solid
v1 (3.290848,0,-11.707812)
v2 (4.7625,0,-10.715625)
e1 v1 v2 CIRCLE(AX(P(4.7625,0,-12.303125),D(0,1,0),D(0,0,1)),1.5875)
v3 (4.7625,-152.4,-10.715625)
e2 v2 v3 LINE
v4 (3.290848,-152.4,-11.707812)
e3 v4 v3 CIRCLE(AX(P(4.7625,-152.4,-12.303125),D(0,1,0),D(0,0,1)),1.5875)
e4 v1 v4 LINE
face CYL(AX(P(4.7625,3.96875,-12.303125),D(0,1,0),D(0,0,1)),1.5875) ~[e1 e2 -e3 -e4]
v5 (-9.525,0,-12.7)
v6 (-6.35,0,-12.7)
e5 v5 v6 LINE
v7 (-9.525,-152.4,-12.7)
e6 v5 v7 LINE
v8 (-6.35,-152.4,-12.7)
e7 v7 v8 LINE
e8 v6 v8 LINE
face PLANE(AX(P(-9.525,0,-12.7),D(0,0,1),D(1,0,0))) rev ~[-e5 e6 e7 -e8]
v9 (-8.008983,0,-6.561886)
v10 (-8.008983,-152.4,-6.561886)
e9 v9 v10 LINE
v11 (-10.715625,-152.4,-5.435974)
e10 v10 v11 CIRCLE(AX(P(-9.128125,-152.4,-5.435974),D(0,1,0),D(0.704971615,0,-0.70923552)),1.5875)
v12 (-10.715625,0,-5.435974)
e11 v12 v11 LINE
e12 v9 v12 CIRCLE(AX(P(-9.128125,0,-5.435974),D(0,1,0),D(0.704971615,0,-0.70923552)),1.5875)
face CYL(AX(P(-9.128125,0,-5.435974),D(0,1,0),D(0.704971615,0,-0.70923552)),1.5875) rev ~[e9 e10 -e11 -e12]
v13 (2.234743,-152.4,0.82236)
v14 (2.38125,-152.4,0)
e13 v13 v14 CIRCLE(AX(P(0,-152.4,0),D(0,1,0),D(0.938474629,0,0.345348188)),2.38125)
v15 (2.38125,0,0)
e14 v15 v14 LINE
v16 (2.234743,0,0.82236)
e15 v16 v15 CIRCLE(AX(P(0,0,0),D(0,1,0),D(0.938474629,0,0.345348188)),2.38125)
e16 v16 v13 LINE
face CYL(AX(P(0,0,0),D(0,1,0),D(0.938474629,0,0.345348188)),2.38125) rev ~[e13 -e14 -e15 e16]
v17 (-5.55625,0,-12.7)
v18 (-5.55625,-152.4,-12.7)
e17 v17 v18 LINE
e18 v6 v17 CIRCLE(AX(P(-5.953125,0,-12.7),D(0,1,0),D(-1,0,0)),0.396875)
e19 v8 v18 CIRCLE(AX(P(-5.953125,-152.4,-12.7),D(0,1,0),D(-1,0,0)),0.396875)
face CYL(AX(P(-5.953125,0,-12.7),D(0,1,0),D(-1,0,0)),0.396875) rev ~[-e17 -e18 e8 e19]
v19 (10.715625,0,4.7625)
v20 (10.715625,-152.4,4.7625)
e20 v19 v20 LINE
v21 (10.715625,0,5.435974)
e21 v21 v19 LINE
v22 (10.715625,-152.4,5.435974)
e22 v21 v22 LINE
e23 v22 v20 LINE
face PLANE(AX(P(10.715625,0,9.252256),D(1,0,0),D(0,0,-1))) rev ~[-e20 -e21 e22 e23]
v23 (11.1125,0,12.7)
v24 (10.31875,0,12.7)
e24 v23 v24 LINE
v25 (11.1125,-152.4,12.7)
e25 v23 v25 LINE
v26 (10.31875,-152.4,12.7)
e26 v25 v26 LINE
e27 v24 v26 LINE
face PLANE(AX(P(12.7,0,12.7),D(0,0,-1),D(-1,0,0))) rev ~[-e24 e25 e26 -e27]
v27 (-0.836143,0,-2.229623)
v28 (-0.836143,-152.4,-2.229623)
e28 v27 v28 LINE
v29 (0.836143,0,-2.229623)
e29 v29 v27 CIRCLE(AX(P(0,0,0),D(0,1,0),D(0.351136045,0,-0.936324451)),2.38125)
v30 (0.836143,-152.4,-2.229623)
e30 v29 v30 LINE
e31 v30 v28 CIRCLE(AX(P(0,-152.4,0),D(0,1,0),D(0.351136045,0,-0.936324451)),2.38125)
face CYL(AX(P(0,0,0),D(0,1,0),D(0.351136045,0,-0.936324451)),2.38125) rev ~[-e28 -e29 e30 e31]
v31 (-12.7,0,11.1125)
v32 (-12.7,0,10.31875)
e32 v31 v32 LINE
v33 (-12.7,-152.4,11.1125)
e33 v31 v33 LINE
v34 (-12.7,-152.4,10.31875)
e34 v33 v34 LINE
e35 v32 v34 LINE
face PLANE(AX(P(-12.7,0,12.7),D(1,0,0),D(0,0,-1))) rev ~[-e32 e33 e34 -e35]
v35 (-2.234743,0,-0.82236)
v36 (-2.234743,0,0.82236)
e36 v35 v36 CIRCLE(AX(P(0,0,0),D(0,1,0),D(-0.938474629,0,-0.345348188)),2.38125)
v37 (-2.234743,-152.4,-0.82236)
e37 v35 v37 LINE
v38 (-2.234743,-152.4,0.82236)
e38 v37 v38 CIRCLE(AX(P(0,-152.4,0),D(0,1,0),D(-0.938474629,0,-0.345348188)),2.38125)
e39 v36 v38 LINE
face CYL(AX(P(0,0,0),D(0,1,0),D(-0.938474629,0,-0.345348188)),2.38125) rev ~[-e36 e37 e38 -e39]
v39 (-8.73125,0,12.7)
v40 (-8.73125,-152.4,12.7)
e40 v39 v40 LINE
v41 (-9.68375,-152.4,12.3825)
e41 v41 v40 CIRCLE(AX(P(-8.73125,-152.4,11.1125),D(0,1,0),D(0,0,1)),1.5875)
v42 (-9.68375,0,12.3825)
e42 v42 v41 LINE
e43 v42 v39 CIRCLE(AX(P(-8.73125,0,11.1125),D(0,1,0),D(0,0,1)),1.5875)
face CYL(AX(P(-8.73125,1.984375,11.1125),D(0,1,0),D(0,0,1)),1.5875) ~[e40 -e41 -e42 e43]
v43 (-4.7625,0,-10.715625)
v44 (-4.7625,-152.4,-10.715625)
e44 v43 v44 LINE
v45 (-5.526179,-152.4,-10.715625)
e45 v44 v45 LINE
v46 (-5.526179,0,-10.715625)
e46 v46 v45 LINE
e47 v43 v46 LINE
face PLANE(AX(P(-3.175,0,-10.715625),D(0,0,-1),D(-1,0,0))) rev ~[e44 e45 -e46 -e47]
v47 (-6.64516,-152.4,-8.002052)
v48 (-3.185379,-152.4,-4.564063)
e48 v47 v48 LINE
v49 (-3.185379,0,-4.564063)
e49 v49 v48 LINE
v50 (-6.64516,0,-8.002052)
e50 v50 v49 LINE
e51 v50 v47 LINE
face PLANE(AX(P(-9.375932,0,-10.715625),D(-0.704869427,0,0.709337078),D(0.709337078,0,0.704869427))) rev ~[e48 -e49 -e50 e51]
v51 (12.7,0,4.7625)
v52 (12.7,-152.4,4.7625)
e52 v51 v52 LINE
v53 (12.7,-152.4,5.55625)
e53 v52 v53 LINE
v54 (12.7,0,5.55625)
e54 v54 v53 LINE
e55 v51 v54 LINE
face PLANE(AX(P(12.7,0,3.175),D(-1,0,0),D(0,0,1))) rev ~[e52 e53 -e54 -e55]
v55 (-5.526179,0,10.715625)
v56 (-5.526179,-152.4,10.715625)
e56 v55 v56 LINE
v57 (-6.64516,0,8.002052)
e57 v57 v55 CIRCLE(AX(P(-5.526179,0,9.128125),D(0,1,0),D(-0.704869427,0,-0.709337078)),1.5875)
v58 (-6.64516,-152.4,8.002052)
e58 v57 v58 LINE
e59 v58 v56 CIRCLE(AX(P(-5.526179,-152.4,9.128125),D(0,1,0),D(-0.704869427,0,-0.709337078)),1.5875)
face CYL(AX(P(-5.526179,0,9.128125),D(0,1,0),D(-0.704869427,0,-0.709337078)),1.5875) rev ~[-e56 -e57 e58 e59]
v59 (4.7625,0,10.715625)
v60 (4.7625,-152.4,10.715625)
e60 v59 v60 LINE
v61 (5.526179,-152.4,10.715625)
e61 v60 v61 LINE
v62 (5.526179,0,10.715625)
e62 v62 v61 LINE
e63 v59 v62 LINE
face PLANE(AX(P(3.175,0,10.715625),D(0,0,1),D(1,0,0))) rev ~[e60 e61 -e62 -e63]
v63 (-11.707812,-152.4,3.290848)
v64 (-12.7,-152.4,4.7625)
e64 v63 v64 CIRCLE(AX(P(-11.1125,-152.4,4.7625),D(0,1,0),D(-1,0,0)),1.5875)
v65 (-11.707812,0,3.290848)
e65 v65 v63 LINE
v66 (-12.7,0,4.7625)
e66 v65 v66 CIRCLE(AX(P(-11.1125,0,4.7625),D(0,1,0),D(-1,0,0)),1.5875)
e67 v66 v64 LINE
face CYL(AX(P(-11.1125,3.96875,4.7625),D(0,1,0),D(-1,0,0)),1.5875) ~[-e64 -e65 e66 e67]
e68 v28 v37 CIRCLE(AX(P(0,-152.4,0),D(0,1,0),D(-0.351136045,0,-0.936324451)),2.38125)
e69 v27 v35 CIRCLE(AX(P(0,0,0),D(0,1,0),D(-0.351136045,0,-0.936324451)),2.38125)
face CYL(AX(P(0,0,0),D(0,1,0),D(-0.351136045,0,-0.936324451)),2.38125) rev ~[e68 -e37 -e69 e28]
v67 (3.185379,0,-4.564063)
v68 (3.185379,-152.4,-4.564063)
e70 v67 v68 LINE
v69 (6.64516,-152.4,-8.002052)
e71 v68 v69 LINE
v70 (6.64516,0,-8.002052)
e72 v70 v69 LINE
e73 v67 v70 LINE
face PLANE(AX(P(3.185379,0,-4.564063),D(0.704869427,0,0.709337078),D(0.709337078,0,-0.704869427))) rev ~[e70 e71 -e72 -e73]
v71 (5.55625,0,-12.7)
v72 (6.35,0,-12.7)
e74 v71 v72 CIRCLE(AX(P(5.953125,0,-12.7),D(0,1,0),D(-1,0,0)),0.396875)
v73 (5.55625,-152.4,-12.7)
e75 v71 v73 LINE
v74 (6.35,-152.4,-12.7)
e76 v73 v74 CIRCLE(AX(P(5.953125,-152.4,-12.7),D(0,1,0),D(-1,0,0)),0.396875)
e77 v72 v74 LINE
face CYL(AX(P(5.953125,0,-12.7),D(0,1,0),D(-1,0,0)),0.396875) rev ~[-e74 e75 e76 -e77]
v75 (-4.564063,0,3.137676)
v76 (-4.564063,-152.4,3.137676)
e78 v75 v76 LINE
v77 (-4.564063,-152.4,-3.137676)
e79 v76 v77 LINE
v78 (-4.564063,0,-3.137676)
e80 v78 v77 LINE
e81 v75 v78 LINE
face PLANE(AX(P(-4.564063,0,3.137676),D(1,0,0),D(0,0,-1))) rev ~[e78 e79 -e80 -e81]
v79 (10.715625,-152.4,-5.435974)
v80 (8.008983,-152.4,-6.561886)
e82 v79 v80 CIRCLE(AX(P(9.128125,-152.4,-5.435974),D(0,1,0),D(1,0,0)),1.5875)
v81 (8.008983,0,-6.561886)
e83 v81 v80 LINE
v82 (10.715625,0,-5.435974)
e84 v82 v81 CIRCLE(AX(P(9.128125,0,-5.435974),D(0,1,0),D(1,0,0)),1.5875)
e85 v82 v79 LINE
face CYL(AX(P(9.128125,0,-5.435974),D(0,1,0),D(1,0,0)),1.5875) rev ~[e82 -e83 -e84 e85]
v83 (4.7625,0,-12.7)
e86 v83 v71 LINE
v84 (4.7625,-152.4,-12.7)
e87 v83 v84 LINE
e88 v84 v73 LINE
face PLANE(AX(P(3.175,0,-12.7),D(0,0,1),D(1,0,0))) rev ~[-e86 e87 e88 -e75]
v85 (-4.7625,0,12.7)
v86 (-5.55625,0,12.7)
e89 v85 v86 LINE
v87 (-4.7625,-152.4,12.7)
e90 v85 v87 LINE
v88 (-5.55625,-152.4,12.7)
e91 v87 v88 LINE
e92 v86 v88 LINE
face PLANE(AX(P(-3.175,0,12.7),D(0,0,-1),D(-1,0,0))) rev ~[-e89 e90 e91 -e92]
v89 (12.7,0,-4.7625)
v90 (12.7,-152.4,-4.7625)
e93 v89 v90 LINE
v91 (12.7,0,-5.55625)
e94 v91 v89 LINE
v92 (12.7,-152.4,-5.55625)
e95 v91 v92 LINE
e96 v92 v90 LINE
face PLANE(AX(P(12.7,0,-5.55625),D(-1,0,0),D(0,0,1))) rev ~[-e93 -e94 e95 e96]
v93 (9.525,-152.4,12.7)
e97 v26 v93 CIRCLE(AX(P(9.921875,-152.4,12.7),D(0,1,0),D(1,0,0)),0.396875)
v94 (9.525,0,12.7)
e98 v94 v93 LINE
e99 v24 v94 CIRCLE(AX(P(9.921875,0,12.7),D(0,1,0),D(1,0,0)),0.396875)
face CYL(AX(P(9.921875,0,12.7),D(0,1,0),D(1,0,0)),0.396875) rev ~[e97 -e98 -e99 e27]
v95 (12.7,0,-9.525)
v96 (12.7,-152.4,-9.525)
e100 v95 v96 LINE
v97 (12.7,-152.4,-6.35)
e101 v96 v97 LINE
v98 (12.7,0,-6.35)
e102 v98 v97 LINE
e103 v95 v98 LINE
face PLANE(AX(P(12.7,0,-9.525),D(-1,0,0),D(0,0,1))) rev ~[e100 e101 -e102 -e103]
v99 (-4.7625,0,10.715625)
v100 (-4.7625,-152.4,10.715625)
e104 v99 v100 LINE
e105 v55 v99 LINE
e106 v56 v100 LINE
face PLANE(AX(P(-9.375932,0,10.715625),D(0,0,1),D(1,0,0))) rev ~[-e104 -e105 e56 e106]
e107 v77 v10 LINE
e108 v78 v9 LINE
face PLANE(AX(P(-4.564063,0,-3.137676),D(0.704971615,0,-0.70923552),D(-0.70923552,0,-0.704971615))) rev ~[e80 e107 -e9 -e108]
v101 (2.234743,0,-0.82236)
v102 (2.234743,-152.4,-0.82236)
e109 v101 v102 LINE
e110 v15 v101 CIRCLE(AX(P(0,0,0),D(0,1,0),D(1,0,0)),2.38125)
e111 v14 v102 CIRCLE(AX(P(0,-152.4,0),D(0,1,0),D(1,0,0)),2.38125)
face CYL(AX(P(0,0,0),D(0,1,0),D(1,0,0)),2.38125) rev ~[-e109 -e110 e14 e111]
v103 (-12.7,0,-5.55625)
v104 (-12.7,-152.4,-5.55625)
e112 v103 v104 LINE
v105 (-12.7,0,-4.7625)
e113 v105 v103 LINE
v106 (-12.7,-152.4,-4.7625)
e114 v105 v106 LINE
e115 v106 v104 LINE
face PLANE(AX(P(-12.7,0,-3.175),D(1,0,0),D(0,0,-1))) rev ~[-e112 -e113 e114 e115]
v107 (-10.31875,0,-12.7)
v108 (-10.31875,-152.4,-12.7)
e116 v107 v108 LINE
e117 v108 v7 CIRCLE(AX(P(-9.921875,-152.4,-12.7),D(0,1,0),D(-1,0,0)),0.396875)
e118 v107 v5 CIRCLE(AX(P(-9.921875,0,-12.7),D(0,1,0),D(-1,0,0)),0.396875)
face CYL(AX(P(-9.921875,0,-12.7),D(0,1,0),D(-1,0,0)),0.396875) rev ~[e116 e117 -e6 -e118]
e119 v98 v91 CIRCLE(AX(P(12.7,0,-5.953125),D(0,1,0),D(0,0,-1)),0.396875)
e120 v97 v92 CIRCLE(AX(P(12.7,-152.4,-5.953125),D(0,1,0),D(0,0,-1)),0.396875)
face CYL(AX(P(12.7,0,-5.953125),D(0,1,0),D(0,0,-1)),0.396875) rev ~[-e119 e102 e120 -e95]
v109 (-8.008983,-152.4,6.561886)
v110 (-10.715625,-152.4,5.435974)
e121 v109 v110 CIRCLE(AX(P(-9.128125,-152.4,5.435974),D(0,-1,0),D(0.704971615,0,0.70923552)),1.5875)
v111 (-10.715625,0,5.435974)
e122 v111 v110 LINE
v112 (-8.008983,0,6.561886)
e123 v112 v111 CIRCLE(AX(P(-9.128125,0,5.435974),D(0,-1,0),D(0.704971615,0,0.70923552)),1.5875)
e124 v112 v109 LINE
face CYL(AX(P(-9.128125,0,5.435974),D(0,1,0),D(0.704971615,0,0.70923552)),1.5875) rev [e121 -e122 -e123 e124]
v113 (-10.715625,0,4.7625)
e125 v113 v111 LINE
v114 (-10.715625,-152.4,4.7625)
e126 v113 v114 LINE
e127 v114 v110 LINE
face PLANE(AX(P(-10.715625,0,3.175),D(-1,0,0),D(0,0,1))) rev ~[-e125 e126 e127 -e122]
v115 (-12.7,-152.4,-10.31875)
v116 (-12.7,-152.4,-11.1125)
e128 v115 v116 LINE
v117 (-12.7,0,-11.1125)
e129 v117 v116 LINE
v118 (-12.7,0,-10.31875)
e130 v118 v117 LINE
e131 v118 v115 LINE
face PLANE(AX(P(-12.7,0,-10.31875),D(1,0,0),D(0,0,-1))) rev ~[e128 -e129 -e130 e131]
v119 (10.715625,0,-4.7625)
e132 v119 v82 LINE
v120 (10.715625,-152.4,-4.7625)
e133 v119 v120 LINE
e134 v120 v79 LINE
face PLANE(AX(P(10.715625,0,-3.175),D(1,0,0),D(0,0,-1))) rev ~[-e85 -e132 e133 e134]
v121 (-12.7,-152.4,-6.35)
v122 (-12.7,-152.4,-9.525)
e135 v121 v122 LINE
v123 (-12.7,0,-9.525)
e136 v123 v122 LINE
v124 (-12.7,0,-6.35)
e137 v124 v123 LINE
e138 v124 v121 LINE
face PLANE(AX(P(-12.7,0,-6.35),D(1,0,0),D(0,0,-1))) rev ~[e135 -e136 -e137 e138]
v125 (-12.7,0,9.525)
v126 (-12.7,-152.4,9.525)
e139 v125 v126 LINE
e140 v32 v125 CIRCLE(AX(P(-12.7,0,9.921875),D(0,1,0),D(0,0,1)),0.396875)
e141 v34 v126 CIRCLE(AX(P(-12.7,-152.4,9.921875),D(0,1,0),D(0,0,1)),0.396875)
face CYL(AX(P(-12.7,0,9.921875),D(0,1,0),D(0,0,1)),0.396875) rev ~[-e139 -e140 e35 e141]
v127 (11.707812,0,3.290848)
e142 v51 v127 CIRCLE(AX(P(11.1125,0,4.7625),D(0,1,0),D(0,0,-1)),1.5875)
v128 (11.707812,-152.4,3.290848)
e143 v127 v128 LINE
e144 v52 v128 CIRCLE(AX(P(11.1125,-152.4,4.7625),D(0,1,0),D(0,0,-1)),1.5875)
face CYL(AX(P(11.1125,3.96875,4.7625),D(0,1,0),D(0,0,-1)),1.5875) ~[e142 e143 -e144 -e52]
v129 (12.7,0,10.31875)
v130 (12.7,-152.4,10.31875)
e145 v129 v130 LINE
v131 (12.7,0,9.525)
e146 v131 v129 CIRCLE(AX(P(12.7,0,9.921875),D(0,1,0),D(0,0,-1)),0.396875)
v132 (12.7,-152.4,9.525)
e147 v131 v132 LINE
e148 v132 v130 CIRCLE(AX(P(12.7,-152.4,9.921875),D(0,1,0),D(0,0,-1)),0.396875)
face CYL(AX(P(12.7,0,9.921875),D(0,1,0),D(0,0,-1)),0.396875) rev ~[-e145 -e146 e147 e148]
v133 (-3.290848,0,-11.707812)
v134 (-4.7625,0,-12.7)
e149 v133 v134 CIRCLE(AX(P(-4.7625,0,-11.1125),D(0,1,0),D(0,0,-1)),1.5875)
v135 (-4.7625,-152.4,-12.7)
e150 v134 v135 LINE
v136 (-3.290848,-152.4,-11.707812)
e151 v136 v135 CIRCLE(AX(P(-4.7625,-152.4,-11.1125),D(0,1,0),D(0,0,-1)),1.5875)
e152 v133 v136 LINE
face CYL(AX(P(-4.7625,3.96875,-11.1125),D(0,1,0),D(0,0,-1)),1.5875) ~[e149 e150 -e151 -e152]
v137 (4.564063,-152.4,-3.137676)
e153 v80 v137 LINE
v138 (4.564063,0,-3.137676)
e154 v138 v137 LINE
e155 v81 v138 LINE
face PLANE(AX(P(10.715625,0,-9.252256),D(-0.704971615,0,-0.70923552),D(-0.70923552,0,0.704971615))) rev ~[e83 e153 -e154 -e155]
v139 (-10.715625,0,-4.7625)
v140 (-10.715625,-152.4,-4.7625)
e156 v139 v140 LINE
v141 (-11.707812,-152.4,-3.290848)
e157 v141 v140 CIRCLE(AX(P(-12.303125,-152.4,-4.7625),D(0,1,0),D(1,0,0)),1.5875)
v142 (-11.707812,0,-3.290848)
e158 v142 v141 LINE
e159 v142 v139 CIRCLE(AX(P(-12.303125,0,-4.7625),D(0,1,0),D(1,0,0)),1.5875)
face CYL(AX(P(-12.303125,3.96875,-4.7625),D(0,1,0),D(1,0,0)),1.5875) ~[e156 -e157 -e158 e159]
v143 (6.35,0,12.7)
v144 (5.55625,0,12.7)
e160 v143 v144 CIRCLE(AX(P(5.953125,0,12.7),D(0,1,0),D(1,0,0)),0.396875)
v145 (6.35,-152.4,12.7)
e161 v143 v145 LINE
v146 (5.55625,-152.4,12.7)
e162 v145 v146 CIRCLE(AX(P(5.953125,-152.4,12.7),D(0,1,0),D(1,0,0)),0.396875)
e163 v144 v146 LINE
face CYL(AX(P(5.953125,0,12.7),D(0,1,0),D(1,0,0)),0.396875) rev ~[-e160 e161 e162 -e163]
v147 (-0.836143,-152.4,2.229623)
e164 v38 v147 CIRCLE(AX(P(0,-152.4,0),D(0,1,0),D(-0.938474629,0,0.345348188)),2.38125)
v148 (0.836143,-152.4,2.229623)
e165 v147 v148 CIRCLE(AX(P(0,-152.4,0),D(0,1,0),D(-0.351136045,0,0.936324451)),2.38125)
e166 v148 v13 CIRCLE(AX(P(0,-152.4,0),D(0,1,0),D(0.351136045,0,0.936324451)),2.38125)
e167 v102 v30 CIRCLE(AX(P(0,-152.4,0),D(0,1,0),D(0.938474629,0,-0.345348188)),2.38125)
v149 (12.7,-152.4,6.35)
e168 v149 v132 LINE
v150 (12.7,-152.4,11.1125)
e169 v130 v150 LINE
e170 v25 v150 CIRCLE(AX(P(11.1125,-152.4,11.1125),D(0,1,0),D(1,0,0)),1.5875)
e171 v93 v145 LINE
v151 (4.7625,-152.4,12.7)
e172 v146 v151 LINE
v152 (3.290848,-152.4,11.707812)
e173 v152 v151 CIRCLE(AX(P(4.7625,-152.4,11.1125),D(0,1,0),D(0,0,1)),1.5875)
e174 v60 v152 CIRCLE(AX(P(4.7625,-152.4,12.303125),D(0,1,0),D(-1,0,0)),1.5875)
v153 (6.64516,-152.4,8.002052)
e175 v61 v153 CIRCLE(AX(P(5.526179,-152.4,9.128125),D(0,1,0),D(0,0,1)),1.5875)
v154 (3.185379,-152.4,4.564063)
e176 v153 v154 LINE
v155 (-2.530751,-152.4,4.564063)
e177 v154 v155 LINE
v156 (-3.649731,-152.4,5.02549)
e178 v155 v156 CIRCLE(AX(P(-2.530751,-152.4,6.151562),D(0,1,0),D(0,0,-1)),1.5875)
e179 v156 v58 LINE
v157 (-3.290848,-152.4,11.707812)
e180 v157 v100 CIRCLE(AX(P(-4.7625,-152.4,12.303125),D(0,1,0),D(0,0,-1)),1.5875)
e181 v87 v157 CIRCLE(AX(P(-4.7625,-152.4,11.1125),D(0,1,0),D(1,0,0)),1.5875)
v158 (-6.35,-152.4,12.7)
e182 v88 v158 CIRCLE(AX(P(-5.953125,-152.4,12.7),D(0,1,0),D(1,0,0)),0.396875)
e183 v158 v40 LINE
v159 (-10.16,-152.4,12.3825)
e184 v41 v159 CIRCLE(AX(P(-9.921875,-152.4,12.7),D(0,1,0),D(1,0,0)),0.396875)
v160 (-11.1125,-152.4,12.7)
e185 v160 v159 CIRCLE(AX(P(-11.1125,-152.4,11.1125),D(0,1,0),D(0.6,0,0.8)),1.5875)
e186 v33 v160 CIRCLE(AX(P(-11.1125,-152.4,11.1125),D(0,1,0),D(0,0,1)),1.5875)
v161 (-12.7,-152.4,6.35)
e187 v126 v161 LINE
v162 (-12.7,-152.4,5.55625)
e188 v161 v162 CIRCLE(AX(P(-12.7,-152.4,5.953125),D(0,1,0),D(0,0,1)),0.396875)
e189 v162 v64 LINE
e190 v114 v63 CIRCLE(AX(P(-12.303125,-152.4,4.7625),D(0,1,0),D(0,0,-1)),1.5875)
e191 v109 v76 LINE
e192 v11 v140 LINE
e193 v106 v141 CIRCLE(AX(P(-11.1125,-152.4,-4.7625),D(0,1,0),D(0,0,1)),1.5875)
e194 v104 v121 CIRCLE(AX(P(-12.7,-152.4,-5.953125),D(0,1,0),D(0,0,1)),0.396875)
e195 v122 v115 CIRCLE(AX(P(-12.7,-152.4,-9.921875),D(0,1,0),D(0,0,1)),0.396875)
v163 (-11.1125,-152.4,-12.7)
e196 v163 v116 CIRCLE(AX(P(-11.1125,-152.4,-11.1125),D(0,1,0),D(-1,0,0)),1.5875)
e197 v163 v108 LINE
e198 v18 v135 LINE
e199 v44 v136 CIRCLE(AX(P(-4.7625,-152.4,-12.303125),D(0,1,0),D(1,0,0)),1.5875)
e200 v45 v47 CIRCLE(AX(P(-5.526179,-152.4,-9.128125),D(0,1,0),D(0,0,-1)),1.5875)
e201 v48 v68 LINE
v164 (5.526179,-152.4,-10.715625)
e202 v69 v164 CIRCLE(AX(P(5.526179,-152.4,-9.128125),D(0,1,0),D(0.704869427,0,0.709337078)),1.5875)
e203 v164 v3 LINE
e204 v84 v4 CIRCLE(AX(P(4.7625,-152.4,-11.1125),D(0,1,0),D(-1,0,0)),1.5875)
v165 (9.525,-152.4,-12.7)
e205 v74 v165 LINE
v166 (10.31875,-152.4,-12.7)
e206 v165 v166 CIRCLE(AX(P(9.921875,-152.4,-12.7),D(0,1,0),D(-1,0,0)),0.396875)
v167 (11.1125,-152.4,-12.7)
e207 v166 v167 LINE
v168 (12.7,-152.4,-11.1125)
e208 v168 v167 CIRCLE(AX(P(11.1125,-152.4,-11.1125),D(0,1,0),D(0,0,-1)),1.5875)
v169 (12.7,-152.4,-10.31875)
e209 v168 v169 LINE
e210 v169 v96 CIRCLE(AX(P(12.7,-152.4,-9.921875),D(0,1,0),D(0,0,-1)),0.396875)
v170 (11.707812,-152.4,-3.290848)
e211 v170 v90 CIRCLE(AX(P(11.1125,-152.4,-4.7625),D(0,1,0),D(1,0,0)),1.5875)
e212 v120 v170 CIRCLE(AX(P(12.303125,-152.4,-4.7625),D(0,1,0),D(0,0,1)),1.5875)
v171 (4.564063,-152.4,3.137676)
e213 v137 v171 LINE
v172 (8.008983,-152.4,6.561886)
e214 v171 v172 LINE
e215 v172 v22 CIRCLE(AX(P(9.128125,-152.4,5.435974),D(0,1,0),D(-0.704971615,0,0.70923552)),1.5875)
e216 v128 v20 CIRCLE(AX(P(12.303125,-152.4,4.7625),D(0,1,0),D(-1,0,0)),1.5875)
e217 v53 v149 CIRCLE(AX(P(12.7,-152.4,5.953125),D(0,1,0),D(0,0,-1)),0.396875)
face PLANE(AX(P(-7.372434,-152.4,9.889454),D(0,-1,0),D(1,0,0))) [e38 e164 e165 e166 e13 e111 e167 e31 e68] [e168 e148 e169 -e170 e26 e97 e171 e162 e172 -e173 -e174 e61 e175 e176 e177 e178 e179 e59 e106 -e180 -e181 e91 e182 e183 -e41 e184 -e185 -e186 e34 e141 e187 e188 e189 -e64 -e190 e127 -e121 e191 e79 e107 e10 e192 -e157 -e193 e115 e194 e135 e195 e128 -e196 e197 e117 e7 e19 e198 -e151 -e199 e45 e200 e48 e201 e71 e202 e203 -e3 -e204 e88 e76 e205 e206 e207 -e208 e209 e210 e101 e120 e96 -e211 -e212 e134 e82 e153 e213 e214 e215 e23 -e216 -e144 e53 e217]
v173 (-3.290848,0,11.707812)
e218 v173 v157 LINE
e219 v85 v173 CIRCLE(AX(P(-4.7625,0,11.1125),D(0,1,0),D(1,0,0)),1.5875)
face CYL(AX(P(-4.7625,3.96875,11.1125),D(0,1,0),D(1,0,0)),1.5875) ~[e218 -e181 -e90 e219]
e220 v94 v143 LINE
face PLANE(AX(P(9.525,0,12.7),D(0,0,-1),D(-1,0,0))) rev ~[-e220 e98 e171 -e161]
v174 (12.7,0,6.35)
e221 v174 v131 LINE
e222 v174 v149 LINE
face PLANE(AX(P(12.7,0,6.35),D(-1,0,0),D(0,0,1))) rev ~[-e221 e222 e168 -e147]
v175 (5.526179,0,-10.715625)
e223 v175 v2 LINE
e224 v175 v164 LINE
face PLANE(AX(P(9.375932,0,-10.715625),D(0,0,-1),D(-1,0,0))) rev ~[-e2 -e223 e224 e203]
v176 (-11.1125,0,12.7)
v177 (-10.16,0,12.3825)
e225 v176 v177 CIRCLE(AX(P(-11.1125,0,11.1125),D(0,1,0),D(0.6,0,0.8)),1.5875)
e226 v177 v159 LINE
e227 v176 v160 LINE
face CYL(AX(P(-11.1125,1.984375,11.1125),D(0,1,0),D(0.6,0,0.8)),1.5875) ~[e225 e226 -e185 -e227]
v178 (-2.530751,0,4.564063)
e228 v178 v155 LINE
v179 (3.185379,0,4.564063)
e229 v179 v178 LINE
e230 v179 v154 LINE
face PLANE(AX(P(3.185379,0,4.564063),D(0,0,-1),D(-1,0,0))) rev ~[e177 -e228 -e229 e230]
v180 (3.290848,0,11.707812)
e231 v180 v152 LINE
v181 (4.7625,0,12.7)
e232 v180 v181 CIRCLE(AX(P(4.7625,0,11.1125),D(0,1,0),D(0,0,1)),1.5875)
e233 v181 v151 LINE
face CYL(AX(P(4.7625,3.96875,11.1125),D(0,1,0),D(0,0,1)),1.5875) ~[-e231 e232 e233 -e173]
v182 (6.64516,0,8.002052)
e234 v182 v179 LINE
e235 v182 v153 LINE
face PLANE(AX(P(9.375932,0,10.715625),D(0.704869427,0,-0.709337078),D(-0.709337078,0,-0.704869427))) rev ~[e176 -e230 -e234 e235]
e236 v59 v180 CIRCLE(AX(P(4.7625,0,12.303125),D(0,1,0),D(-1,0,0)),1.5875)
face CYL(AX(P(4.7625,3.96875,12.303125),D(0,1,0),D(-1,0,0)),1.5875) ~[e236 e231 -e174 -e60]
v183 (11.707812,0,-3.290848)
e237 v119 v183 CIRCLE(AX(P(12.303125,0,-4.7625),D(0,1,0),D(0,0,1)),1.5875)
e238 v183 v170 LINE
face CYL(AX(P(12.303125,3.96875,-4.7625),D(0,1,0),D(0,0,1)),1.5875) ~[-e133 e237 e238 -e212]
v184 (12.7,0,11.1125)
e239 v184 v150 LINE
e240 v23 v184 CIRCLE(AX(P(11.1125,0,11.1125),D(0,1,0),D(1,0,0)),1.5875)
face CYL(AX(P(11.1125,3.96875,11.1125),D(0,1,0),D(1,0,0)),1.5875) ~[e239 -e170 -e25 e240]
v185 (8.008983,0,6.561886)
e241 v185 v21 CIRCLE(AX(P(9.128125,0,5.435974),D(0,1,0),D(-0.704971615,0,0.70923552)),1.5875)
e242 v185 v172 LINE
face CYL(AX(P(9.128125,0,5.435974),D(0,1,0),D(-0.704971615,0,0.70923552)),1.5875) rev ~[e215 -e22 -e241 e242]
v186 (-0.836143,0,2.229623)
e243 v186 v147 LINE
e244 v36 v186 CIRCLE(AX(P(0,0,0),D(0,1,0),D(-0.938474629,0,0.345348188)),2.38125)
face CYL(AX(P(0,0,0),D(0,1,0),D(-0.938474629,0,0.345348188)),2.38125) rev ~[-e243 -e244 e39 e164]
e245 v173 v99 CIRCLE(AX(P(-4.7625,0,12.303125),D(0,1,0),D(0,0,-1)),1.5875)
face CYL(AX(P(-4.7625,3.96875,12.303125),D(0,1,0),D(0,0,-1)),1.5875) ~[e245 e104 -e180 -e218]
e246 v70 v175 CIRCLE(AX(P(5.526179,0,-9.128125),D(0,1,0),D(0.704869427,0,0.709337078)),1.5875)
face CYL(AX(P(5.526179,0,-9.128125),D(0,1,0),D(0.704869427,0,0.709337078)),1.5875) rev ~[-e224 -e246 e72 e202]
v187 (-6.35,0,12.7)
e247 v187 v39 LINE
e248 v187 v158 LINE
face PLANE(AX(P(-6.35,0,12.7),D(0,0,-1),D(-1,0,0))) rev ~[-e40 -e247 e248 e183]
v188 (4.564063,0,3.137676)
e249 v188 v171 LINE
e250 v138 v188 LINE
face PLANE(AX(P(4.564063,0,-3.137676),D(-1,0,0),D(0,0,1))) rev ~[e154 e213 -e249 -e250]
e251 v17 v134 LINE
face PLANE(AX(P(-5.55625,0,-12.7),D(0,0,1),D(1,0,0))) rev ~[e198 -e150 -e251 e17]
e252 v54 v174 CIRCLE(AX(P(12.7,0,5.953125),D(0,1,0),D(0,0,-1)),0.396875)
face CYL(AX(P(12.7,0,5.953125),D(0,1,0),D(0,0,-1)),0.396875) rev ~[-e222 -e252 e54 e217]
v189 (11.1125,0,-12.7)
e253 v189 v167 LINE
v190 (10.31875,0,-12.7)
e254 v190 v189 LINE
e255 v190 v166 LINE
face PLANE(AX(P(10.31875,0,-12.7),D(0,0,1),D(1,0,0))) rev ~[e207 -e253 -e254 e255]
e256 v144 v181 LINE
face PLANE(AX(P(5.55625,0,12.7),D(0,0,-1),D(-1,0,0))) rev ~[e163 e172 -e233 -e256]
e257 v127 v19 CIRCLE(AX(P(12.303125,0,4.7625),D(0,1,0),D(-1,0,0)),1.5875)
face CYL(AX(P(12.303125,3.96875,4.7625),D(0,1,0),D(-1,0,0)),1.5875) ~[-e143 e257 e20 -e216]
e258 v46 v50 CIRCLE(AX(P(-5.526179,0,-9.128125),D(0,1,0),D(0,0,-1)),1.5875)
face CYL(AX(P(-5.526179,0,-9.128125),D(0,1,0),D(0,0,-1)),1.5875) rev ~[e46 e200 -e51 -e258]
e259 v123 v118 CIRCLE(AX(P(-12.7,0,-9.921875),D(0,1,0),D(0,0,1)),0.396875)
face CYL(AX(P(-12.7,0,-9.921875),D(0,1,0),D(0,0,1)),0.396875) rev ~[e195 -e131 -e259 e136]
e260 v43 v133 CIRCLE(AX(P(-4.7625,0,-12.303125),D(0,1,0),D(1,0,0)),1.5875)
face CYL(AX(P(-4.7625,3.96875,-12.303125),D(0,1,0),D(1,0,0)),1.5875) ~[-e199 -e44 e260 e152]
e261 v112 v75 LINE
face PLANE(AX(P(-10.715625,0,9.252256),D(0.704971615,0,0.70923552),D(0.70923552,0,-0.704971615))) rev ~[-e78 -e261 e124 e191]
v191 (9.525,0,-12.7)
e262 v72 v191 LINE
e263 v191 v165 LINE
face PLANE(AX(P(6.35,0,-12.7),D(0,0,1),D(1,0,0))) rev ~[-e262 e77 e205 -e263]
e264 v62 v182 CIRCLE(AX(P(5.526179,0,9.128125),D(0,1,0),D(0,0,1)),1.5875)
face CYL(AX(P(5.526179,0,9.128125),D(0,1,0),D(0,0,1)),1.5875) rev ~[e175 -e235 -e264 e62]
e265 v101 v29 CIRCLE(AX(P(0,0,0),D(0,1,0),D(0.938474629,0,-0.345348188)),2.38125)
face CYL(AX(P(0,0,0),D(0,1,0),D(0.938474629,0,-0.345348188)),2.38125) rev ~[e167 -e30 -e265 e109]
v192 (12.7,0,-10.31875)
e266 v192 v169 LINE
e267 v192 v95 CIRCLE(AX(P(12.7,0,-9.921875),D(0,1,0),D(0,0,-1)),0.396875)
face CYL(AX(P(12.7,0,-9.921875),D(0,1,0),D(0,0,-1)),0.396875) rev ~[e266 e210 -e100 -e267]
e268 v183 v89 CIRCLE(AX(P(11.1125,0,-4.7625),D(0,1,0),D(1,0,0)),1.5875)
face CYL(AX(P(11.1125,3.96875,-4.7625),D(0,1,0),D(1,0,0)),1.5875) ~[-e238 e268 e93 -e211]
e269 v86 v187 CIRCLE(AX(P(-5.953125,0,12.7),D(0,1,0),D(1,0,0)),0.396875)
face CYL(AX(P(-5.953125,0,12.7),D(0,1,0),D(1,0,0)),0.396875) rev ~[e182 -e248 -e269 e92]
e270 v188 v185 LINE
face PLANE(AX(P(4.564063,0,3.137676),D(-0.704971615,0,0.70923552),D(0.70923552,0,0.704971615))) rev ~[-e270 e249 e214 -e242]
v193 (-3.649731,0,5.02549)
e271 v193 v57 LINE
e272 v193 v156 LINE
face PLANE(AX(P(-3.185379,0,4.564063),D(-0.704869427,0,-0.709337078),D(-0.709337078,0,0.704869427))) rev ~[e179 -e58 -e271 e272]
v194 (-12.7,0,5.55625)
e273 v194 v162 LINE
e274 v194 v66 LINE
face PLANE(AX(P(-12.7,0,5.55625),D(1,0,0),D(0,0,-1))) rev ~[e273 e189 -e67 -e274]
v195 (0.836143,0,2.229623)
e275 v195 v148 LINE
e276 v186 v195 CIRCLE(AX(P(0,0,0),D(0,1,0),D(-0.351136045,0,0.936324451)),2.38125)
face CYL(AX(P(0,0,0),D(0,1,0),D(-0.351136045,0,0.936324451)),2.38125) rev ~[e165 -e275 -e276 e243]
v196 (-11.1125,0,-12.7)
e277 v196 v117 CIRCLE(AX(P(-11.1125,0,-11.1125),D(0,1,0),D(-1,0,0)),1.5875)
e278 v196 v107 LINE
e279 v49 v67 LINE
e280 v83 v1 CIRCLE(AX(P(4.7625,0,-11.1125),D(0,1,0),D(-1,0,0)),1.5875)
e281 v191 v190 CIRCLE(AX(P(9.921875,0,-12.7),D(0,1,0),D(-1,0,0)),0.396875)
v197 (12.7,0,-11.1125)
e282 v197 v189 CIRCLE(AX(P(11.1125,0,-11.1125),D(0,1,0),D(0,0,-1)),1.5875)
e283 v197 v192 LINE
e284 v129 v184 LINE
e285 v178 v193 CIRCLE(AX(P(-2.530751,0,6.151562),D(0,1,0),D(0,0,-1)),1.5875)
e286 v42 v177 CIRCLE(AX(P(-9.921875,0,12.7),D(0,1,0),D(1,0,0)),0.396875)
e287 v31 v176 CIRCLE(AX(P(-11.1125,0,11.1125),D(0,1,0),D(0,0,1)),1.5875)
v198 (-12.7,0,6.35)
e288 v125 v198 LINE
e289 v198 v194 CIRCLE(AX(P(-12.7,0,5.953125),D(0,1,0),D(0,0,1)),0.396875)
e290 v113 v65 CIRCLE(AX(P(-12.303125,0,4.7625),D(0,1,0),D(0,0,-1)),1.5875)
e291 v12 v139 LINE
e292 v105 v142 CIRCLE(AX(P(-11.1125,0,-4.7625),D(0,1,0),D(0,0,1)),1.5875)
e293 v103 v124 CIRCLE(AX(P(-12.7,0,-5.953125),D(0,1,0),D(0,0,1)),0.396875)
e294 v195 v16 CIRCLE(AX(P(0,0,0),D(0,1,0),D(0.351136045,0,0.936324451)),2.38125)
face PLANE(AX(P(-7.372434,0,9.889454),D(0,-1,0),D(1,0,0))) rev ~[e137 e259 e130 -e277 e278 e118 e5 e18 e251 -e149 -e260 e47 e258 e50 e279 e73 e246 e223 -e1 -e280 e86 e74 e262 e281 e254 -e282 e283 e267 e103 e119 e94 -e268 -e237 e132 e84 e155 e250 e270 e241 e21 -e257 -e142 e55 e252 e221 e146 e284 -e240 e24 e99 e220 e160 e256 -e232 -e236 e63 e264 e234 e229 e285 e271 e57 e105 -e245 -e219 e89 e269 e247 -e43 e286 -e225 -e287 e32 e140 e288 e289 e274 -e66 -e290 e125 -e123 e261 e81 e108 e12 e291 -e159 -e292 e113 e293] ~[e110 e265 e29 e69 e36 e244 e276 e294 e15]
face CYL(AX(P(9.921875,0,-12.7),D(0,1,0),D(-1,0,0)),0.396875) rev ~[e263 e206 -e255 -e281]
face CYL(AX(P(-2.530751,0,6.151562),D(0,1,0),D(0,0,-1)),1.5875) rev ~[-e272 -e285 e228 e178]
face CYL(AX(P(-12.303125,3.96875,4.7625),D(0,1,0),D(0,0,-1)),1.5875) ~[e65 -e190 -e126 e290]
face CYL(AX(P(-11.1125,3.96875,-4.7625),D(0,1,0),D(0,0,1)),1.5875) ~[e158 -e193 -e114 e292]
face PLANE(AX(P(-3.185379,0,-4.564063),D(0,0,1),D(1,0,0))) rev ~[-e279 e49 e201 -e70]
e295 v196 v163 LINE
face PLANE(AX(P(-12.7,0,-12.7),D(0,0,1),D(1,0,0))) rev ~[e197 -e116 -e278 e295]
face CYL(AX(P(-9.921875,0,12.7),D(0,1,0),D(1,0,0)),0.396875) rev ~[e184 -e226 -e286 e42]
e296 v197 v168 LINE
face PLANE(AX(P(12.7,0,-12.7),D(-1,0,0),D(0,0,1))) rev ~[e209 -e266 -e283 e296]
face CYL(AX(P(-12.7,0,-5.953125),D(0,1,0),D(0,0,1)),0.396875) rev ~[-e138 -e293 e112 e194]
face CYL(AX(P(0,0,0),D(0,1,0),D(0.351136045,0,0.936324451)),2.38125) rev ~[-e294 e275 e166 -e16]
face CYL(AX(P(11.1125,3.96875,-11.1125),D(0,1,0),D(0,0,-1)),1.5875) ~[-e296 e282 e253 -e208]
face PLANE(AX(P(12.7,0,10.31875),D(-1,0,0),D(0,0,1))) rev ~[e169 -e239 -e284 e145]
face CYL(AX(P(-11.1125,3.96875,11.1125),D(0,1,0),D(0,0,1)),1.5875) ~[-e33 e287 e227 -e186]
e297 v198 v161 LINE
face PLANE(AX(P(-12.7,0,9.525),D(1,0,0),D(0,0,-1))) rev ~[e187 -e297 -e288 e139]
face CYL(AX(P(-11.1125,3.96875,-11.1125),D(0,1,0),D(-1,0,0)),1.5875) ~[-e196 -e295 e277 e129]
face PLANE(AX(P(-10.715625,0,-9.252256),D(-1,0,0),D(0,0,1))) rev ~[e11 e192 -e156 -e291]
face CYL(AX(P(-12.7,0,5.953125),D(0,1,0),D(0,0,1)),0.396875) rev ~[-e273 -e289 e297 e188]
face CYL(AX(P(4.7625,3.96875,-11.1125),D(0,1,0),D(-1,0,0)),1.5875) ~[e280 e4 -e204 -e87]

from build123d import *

# Parameters (mm, degrees)
F1_DEPTH    = 152.4
F2_T1_DEPTH = 152.4
F2_T3_DEPTH = 160.3375
F2_T5_DEPTH = 156.36875


# Not quite as in the source:
# - a fillet or chamfer that OpenCascade refuses, or shapes differently, is made with other operations: its cross-section is extruded or revolved along the edge and cut away or added


with BuildPart() as f1:
    # F0 (on Front) → F1 (new body)
    with BuildSketch(Plane.XZ):
        with BuildLine():
            ThreePointArc((-0.8361427067, 2.2296225996), (0, 2.38125), (0.8361427067, 2.2296225996))
            Line((0.8361427067, 2.2296225996), (3.1853789104, 4.5640625))
            Line((3.1853789104, 4.5640625), (-3.1853789104, 4.5640625))
            Line((-3.1853789104, 4.5640625), (-0.8361427067, 2.2296225996))
        make_face()
        with BuildLine():
            ThreePointArc((-2.2347427098, 0.8223603732), (-1.6889881746, 1.6785918231), (-0.8361427067, 2.2296225996))
            Line((-0.8361427067, 2.2296225996), (-3.1853789104, 4.5640625))
            Line((-3.1853789104, 4.5640625), (-4.5640625, 4.5640625))
            Line((-4.5640625, 4.5640625), (-4.5640625, 3.1376763557))
            Line((-4.5640625, 3.1376763557), (-2.2347427098, 0.8223603732))
        make_face()
        with BuildLine():
            ThreePointArc((-2.2347427098, -0.8223603732), (-2.38125, 0), (-2.2347427098, 0.8223603732))
            Line((-2.2347427098, 0.8223603732), (-4.5640625, 3.1376763557))
            Line((-4.5640625, 3.1376763557), (-4.5640625, -3.1376763557))
            Line((-4.5640625, -3.1376763557), (-2.2347427098, -0.8223603732))
        make_face()
        with BuildLine():
            Line((-3.1853789104, -4.5640625), (-0.8361427067, -2.2296225996))
            ThreePointArc((-0.8361427067, -2.2296225996), (-1.6889881746, -1.6785918231), (-2.2347427098, -0.8223603732))
            Line((-2.2347427098, -0.8223603732), (-4.5640625, -3.1376763557))
            Line((-4.5640625, -3.1376763557), (-4.5640625, -4.5640625))
            Line((-4.5640625, -4.5640625), (-3.1853789104, -4.5640625))
        make_face()
        with BuildLine():
            Line((3.1853789104, -4.5640625), (0.8361427067, -2.2296225996))
            ThreePointArc((0.8361427067, -2.2296225996), (0, -2.38125), (-0.8361427067, -2.2296225996))
            Line((-0.8361427067, -2.2296225996), (-3.1853789104, -4.5640625))
            Line((-3.1853789104, -4.5640625), (3.1853789104, -4.5640625))
        make_face()
        with BuildLine():
            Line((4.5640625, -3.1376763557), (2.2347427098, -0.8223603732))
            ThreePointArc((2.2347427098, -0.8223603732), (1.6889881746, -1.6785918231), (0.8361427067, -2.2296225996))
            Line((0.8361427067, -2.2296225996), (3.1853789104, -4.5640625))
            Line((3.1853789104, -4.5640625), (4.5640625, -4.5640625))
            Line((4.5640625, -4.5640625), (4.5640625, -3.1376763557))
        make_face()
        with BuildLine():
            ThreePointArc((2.2347427098, 0.8223603732), (2.3443370748, 0.4176544533), (2.38125, 0))
            ThreePointArc((2.38125, 0), (2.3443370748, -0.4176544533), (2.2347427098, -0.8223603732))
            Line((2.2347427098, -0.8223603732), (4.5640625, -3.1376763557))
            Line((4.5640625, -3.1376763557), (4.5640625, 3.1376763557))
            Line((4.5640625, 3.1376763557), (2.2347427098, 0.8223603732))
        make_face()
        with BuildLine():
            ThreePointArc((0.8361427067, 2.2296225996), (1.6889881746, 1.6785918231), (2.2347427098, 0.8223603732))
            Line((2.2347427098, 0.8223603732), (4.5640625, 3.1376763557))
            Line((4.5640625, 3.1376763557), (4.5640625, 4.5640625))
            Line((4.5640625, 4.5640625), (3.1853789104, 4.5640625))
            Line((3.1853789104, 4.5640625), (0.8361427067, 2.2296225996))
        make_face()
        Polygon((4.5640625, 4.5640625), (4.5640625, 3.1376763557), (10.715625, 9.2522558281), (12.7, 11.2247008192), (12.7, 12.7), (11.3728841543, 12.7), (9.3759316558, 10.715625), (3.1853789104, 4.5640625), align=None)
        with BuildLine():
            Line((12.7, 11.2247008192), (10.715625, 9.2522558281))
            Line((10.715625, 9.2522558281), (10.715625, 7.14375))
            Line((10.715625, 7.14375), (10.715625, 3.175))
            Line((10.715625, 3.175), (12.7, 3.175))
            Line((12.7, 3.175), (12.7, 5.55625))
            ThreePointArc((12.7, 5.55625), (12.303125, 5.953125), (12.7, 6.35))
            Line((12.7, 6.35), (12.7, 9.525))
            ThreePointArc((12.7, 9.525), (12.303125, 9.921875), (12.7, 10.31875))
            Line((12.7, 10.31875), (12.7, 11.2247008192))
        make_face()
        with BuildLine():
            Line((7.14375, 10.715625), (9.3759316558, 10.715625))
            Line((9.3759316558, 10.715625), (11.3728841543, 12.7))
            Line((11.3728841543, 12.7), (10.31875, 12.7))
            ThreePointArc((10.31875, 12.7), (9.921875, 12.303125), (9.525, 12.7))
            Line((9.525, 12.7), (6.35, 12.7))
            ThreePointArc((6.35, 12.7), (5.953125, 12.303125), (5.55625, 12.7))
            Line((5.55625, 12.7), (3.175, 12.7))
            Line((3.175, 12.7), (3.175, 10.715625))
            Line((3.175, 10.715625), (7.14375, 10.715625))
        make_face()
        with BuildLine():
            Line((-11.3728841543, 12.7), (-9.3759316558, 10.715625))
            Line((-9.3759316558, 10.715625), (-7.14375, 10.715625))
            Line((-7.14375, 10.715625), (-3.175, 10.715625))
            Line((-3.175, 10.715625), (-3.175, 12.7))
            Line((-3.175, 12.7), (-5.55625, 12.7))
            ThreePointArc((-5.55625, 12.7), (-5.953125, 12.303125), (-6.35, 12.7))
            Line((-6.35, 12.7), (-7.14375, 12.7))
            Line((-7.14375, 12.7), (-9.525, 12.7))
            ThreePointArc((-9.525, 12.7), (-9.921875, 12.303125), (-10.31875, 12.7))
            Line((-10.31875, 12.7), (-11.3728841543, 12.7))
        make_face()
        Polygon((-4.5640625, 4.5640625), (-3.1853789104, 4.5640625), (-9.3759316558, 10.715625), (-11.3728841543, 12.7), (-12.7, 11.2247008192), (-10.715625, 9.2522558281), (-4.5640625, 3.1376763557), align=None)
        Polygon((-12.7, 11.2247008192), (-11.3728841543, 12.7), (-12.7, 12.7), align=None)
        with BuildLine():
            Line((-10.715625, 7.14375), (-10.715625, 9.2522558281))
            Line((-10.715625, 9.2522558281), (-12.7, 11.2247008192))
            Line((-12.7, 11.2247008192), (-12.7, 10.31875))
            ThreePointArc((-12.7, 10.31875), (-12.303125, 9.921875), (-12.7, 9.525))
            Line((-12.7, 9.525), (-12.7, 6.35))
            ThreePointArc((-12.7, 6.35), (-12.303125, 5.953125), (-12.7, 5.55625))
            Line((-12.7, 5.55625), (-12.7, 3.175))
            Line((-12.7, 3.175), (-10.715625, 3.175))
            Line((-10.715625, 3.175), (-10.715625, 7.14375))
        make_face()
        with BuildLine():
            Line((-12.7, -11.2247008192), (-10.715625, -9.2522558281))
            Line((-10.715625, -9.2522558281), (-10.715625, -7.14375))
            Line((-10.715625, -7.14375), (-10.715625, -3.175))
            Line((-10.715625, -3.175), (-12.7, -3.175))
            Line((-12.7, -3.175), (-12.7, -5.55625))
            ThreePointArc((-12.7, -5.55625), (-12.303125, -5.953125), (-12.7, -6.35))
            Line((-12.7, -6.35), (-12.7, -9.525))
            ThreePointArc((-12.7, -9.525), (-12.303125, -9.921875), (-12.7, -10.31875))
            Line((-12.7, -10.31875), (-12.7, -11.2247008192))
        make_face()
        Polygon((-9.3759316558, -10.715625), (-3.1853789104, -4.5640625), (-4.5640625, -4.5640625), (-4.5640625, -3.1376763557), (-10.715625, -9.2522558281), (-12.7, -11.2247008192), (-12.7, -12.7), (-11.3728841543, -12.7), align=None)
        with BuildLine():
            Line((-7.14375, -10.715625), (-9.3759316558, -10.715625))
            Line((-9.3759316558, -10.715625), (-11.3728841543, -12.7))
            Line((-11.3728841543, -12.7), (-10.31875, -12.7))
            ThreePointArc((-10.31875, -12.7), (-9.921875, -12.303125), (-9.525, -12.7))
            Line((-9.525, -12.7), (-6.35, -12.7))
            ThreePointArc((-6.35, -12.7), (-5.953125, -12.303125), (-5.55625, -12.7))
            Line((-5.55625, -12.7), (-3.175, -12.7))
            Line((-3.175, -12.7), (-3.175, -10.715625))
            Line((-3.175, -10.715625), (-7.14375, -10.715625))
        make_face()
        with BuildLine():
            Line((11.3728841543, -12.7), (9.3759316558, -10.715625))
            Line((9.3759316558, -10.715625), (7.14375, -10.715625))
            Line((7.14375, -10.715625), (3.175, -10.715625))
            Line((3.175, -10.715625), (3.175, -12.7))
            Line((3.175, -12.7), (5.55625, -12.7))
            ThreePointArc((5.55625, -12.7), (5.953125, -12.303125), (6.35, -12.7))
            Line((6.35, -12.7), (9.525, -12.7))
            ThreePointArc((9.525, -12.7), (9.921875, -12.303125), (10.31875, -12.7))
            Line((10.31875, -12.7), (11.3728841543, -12.7))
        make_face()
        Polygon((10.715625, -9.2522558281), (4.5640625, -3.1376763557), (4.5640625, -4.5640625), (3.1853789104, -4.5640625), (9.3759316558, -10.715625), (11.3728841543, -12.7), (12.7, -12.7), (12.7, -11.2247008192), align=None)
        with BuildLine():
            Line((10.715625, -7.14375), (10.715625, -9.2522558281))
            Line((10.715625, -9.2522558281), (12.7, -11.2247008192))
            Line((12.7, -11.2247008192), (12.7, -10.31875))
            ThreePointArc((12.7, -10.31875), (12.303125, -9.921875), (12.7, -9.525))
            Line((12.7, -9.525), (12.7, -6.35))
            ThreePointArc((12.7, -6.35), (12.303125, -5.953125), (12.7, -5.55625))
            Line((12.7, -5.55625), (12.7, -3.175))
            Line((12.7, -3.175), (10.715625, -3.175))
            Line((10.715625, -3.175), (10.715625, -7.14375))
        make_face()
    extrude(amount=F1_DEPTH)

    # F2: fillet of radius 1.5875 on 31 edges, made by hand

    # F2_s2 → F2_t1 (join)
    with BuildSketch(Plane.XZ):
        with BuildLine():
            ThreePointArc((-6.6451596968, 8.0020523886), (-6.9937960043, 9.7333175229), (-5.5261794807, 10.715625))
            Line((-5.5261794807, 10.715625), (-9.3759316558, 10.715625))
            Line((-9.3759316558, 10.715625), (-6.6451596968, 8.0020523886))
        make_face()
        with BuildLine():
            ThreePointArc((-8.0089825615, 6.5618856508), (-9.7378452755, 6.9017155215), (-10.715625, 5.4359742634))
            Line((-10.715625, 5.4359742634), (-10.715625, 9.2522558281))
            Line((-10.715625, 9.2522558281), (-8.0089825615, 6.5618856508))
        make_face()
        with BuildLine():
            ThreePointArc((5.5261794807, 10.715625), (6.9937960043, 9.7333175229), (6.6451596968, 8.0020523886))
            Line((6.6451596968, 8.0020523886), (9.3759316558, 10.715625))
            Line((9.3759316558, 10.715625), (5.5261794807, 10.715625))
        make_face()
        with BuildLine():
            ThreePointArc((8.0089825615, 6.5618856508), (9.7378452755, 6.9017155215), (10.715625, 5.4359742634))
            Line((10.715625, 5.4359742634), (10.715625, 9.2522558281))
            Line((10.715625, 9.2522558281), (8.0089825615, 6.5618856508))
        make_face()
        with BuildLine():
            ThreePointArc((10.715625, -5.4359742634), (9.7378452755, -6.9017155215), (8.0089825615, -6.5618856508))
            Line((8.0089825615, -6.5618856508), (10.715625, -9.2522558281))
            Line((10.715625, -9.2522558281), (10.715625, -5.4359742634))
        make_face()
        with BuildLine():
            ThreePointArc((6.6451596968, -8.0020523886), (6.9937960043, -9.7333175229), (5.5261794807, -10.715625))
            Line((5.5261794807, -10.715625), (9.3759316558, -10.715625))
            Line((9.3759316558, -10.715625), (6.6451596968, -8.0020523886))
        make_face()
        with BuildLine():
            ThreePointArc((-5.5261794807, -10.715625), (-6.9937960043, -9.7333175229), (-6.6451596968, -8.0020523886))
            Line((-6.6451596968, -8.0020523886), (-9.3759316558, -10.715625))
            Line((-9.3759316558, -10.715625), (-5.5261794807, -10.715625))
        make_face()
        with BuildLine():
            ThreePointArc((-8.0089825615, -6.5618856508), (-9.7378452755, -6.9017155215), (-10.715625, -5.4359742634))
            Line((-10.715625, -5.4359742634), (-10.715625, -9.2522558281))
            Line((-10.715625, -9.2522558281), (-8.0089825615, -6.5618856508))
        make_face()
        with BuildLine():
            ThreePointArc((-2.530750733, 4.5640625), (-3.1359432558, 4.6839459764), (-3.649730949, 5.0254898886))
            Line((-3.649730949, 5.0254898886), (-3.1853789104, 4.5640625))
            Line((-3.1853789104, 4.5640625), (-2.530750733, 4.5640625))
        make_face()
    extrude(amount=F2_T1_DEPTH)

    # F2_s4 → F2_t3 (cut)
    with BuildSketch(Plane.XZ.offset(-3.96875)):
        with BuildLine():
            ThreePointArc((-12.7, -11.1125), (-12.2350320151, -12.2350320151), (-11.1125, -12.7))
            Line((-11.1125, -12.7), (-12.7, -12.7))
            Line((-12.7, -12.7), (-12.7, -11.1125))
        make_face()
        with BuildLine():
            ThreePointArc((11.1125, -12.7), (12.2350320151, -12.2350320151), (12.7, -11.1125))
            Line((12.7, -11.1125), (12.7, -12.7))
            Line((12.7, -12.7), (11.1125, -12.7))
        make_face()
        with BuildLine():
            ThreePointArc((12.7, 11.1125), (12.2350320151, 12.2350320151), (11.1125, 12.7))
            Line((11.1125, 12.7), (12.7, 12.7))
            Line((12.7, 12.7), (12.7, 11.1125))
        make_face()
        with BuildLine():
            ThreePointArc((-12.7, 4.7625), (-12.2350320151, 3.6399679849), (-11.1125, 3.175))
            Line((-11.1125, 3.175), (-12.7, 3.175))
            Line((-12.7, 3.175), (-12.7, 4.7625))
        make_face()
        with BuildLine():
            ThreePointArc((-11.1125, -3.175), (-12.2350320151, -3.6399679849), (-12.7, -4.7625))
            Line((-12.7, -4.7625), (-12.7, -3.175))
            Line((-12.7, -3.175), (-11.1125, -3.175))
        make_face()
        with BuildLine():
            ThreePointArc((-12.303125, 3.175), (-11.1805929849, 3.6399679849), (-10.715625, 4.7625))
            Line((-10.715625, 4.7625), (-10.715625, 3.175))
            Line((-10.715625, 3.175), (-12.303125, 3.175))
        make_face()
        with BuildLine():
            ThreePointArc((-10.715625, -4.7625), (-11.1805929849, -3.6399679849), (-12.303125, -3.175))
            Line((-12.303125, -3.175), (-10.715625, -3.175))
            Line((-10.715625, -3.175), (-10.715625, -4.7625))
        make_face()
        with BuildLine():
            ThreePointArc((-3.175, -12.303125), (-3.6399679849, -11.1805929849), (-4.7625, -10.715625))
            Line((-4.7625, -10.715625), (-3.175, -10.715625))
            Line((-3.175, -10.715625), (-3.175, -12.303125))
        make_face()
        with BuildLine():
            ThreePointArc((-4.7625, -12.7), (-3.6399679849, -12.2350320151), (-3.175, -11.1125))
            Line((-3.175, -11.1125), (-3.175, -12.7))
            Line((-3.175, -12.7), (-4.7625, -12.7))
        make_face()
        with BuildLine():
            ThreePointArc((3.175, -11.1125), (3.6399679849, -12.2350320151), (4.7625, -12.7))
            Line((4.7625, -12.7), (3.175, -12.7))
            Line((3.175, -12.7), (3.175, -11.1125))
        make_face()
        with BuildLine():
            ThreePointArc((4.7625, -10.715625), (3.6399679849, -11.1805929849), (3.175, -12.303125))
            Line((3.175, -12.303125), (3.175, -10.715625))
            Line((3.175, -10.715625), (4.7625, -10.715625))
        make_face()
        with BuildLine():
            ThreePointArc((12.7, -4.7625), (12.2350320151, -3.6399679849), (11.1125, -3.175))
            Line((11.1125, -3.175), (12.7, -3.175))
            Line((12.7, -3.175), (12.7, -4.7625))
        make_face()
        with BuildLine():
            ThreePointArc((11.1125, 3.175), (12.2350320151, 3.6399679849), (12.7, 4.7625))
            Line((12.7, 4.7625), (12.7, 3.175))
            Line((12.7, 3.175), (11.1125, 3.175))
        make_face()
        with BuildLine():
            ThreePointArc((12.303125, -3.175), (11.1805929849, -3.6399679849), (10.715625, -4.7625))
            Line((10.715625, -4.7625), (10.715625, -3.175))
            Line((10.715625, -3.175), (12.303125, -3.175))
        make_face()
        with BuildLine():
            ThreePointArc((10.715625, 4.7625), (11.1805929849, 3.6399679849), (12.303125, 3.175))
            Line((12.303125, 3.175), (10.715625, 3.175))
            Line((10.715625, 3.175), (10.715625, 4.7625))
        make_face()
        with BuildLine():
            ThreePointArc((-4.7625, 10.715625), (-3.6399679849, 11.1805929849), (-3.175, 12.303125))
            Line((-3.175, 12.303125), (-3.175, 10.715625))
            Line((-3.175, 10.715625), (-4.7625, 10.715625))
        make_face()
        with BuildLine():
            ThreePointArc((-3.175, 11.1125), (-3.6399679849, 12.2350320151), (-4.7625, 12.7))
            Line((-4.7625, 12.7), (-3.175, 12.7))
            Line((-3.175, 12.7), (-3.175, 11.1125))
        make_face()
        with BuildLine():
            ThreePointArc((4.7625, 12.7), (3.6399679849, 12.2350320151), (3.175, 11.1125))
            Line((3.175, 11.1125), (3.175, 12.7))
            Line((3.175, 12.7), (4.7625, 12.7))
        make_face()
        with BuildLine():
            ThreePointArc((3.175, 12.303125), (3.6399679849, 11.1805929849), (4.7625, 10.715625))
            Line((4.7625, 10.715625), (3.175, 10.715625))
            Line((3.175, 10.715625), (3.175, 12.303125))
        make_face()
        with BuildLine():
            ThreePointArc((-11.1125, 12.7), (-12.2350320151, 12.2350320151), (-12.7, 11.1125))
            Line((-12.7, 11.1125), (-12.7, 12.7))
            Line((-12.7, 12.7), (-11.1125, 12.7))
        make_face()
    extrude(amount=F2_T3_DEPTH, mode=Mode.SUBTRACT)

    # F2_s6 → F2_t5 (cut)
    with BuildSketch(Plane.XZ.offset(-1.984375)):
        with BuildLine():
            ThreePointArc((-8.73125, 12.7), (-9.2332615786, 12.6185347357), (-9.68375, 12.3825))
            ThreePointArc((-9.68375, 12.3825), (-9.5668992086, 12.5225121043), (-9.525, 12.7))
            Line((-9.525, 12.7), (-8.73125, 12.7))
        make_face()
        with BuildLine():
            ThreePointArc((-10.16, 12.3825), (-10.6104884214, 12.6185347357), (-11.1125, 12.7))
            Line((-11.1125, 12.7), (-10.31875, 12.7))
            ThreePointArc((-10.31875, 12.7), (-10.2768507914, 12.5225121043), (-10.16, 12.3825))
        make_face()
    extrude(amount=F2_T5_DEPTH, mode=Mode.SUBTRACT)


solid = f1.part
